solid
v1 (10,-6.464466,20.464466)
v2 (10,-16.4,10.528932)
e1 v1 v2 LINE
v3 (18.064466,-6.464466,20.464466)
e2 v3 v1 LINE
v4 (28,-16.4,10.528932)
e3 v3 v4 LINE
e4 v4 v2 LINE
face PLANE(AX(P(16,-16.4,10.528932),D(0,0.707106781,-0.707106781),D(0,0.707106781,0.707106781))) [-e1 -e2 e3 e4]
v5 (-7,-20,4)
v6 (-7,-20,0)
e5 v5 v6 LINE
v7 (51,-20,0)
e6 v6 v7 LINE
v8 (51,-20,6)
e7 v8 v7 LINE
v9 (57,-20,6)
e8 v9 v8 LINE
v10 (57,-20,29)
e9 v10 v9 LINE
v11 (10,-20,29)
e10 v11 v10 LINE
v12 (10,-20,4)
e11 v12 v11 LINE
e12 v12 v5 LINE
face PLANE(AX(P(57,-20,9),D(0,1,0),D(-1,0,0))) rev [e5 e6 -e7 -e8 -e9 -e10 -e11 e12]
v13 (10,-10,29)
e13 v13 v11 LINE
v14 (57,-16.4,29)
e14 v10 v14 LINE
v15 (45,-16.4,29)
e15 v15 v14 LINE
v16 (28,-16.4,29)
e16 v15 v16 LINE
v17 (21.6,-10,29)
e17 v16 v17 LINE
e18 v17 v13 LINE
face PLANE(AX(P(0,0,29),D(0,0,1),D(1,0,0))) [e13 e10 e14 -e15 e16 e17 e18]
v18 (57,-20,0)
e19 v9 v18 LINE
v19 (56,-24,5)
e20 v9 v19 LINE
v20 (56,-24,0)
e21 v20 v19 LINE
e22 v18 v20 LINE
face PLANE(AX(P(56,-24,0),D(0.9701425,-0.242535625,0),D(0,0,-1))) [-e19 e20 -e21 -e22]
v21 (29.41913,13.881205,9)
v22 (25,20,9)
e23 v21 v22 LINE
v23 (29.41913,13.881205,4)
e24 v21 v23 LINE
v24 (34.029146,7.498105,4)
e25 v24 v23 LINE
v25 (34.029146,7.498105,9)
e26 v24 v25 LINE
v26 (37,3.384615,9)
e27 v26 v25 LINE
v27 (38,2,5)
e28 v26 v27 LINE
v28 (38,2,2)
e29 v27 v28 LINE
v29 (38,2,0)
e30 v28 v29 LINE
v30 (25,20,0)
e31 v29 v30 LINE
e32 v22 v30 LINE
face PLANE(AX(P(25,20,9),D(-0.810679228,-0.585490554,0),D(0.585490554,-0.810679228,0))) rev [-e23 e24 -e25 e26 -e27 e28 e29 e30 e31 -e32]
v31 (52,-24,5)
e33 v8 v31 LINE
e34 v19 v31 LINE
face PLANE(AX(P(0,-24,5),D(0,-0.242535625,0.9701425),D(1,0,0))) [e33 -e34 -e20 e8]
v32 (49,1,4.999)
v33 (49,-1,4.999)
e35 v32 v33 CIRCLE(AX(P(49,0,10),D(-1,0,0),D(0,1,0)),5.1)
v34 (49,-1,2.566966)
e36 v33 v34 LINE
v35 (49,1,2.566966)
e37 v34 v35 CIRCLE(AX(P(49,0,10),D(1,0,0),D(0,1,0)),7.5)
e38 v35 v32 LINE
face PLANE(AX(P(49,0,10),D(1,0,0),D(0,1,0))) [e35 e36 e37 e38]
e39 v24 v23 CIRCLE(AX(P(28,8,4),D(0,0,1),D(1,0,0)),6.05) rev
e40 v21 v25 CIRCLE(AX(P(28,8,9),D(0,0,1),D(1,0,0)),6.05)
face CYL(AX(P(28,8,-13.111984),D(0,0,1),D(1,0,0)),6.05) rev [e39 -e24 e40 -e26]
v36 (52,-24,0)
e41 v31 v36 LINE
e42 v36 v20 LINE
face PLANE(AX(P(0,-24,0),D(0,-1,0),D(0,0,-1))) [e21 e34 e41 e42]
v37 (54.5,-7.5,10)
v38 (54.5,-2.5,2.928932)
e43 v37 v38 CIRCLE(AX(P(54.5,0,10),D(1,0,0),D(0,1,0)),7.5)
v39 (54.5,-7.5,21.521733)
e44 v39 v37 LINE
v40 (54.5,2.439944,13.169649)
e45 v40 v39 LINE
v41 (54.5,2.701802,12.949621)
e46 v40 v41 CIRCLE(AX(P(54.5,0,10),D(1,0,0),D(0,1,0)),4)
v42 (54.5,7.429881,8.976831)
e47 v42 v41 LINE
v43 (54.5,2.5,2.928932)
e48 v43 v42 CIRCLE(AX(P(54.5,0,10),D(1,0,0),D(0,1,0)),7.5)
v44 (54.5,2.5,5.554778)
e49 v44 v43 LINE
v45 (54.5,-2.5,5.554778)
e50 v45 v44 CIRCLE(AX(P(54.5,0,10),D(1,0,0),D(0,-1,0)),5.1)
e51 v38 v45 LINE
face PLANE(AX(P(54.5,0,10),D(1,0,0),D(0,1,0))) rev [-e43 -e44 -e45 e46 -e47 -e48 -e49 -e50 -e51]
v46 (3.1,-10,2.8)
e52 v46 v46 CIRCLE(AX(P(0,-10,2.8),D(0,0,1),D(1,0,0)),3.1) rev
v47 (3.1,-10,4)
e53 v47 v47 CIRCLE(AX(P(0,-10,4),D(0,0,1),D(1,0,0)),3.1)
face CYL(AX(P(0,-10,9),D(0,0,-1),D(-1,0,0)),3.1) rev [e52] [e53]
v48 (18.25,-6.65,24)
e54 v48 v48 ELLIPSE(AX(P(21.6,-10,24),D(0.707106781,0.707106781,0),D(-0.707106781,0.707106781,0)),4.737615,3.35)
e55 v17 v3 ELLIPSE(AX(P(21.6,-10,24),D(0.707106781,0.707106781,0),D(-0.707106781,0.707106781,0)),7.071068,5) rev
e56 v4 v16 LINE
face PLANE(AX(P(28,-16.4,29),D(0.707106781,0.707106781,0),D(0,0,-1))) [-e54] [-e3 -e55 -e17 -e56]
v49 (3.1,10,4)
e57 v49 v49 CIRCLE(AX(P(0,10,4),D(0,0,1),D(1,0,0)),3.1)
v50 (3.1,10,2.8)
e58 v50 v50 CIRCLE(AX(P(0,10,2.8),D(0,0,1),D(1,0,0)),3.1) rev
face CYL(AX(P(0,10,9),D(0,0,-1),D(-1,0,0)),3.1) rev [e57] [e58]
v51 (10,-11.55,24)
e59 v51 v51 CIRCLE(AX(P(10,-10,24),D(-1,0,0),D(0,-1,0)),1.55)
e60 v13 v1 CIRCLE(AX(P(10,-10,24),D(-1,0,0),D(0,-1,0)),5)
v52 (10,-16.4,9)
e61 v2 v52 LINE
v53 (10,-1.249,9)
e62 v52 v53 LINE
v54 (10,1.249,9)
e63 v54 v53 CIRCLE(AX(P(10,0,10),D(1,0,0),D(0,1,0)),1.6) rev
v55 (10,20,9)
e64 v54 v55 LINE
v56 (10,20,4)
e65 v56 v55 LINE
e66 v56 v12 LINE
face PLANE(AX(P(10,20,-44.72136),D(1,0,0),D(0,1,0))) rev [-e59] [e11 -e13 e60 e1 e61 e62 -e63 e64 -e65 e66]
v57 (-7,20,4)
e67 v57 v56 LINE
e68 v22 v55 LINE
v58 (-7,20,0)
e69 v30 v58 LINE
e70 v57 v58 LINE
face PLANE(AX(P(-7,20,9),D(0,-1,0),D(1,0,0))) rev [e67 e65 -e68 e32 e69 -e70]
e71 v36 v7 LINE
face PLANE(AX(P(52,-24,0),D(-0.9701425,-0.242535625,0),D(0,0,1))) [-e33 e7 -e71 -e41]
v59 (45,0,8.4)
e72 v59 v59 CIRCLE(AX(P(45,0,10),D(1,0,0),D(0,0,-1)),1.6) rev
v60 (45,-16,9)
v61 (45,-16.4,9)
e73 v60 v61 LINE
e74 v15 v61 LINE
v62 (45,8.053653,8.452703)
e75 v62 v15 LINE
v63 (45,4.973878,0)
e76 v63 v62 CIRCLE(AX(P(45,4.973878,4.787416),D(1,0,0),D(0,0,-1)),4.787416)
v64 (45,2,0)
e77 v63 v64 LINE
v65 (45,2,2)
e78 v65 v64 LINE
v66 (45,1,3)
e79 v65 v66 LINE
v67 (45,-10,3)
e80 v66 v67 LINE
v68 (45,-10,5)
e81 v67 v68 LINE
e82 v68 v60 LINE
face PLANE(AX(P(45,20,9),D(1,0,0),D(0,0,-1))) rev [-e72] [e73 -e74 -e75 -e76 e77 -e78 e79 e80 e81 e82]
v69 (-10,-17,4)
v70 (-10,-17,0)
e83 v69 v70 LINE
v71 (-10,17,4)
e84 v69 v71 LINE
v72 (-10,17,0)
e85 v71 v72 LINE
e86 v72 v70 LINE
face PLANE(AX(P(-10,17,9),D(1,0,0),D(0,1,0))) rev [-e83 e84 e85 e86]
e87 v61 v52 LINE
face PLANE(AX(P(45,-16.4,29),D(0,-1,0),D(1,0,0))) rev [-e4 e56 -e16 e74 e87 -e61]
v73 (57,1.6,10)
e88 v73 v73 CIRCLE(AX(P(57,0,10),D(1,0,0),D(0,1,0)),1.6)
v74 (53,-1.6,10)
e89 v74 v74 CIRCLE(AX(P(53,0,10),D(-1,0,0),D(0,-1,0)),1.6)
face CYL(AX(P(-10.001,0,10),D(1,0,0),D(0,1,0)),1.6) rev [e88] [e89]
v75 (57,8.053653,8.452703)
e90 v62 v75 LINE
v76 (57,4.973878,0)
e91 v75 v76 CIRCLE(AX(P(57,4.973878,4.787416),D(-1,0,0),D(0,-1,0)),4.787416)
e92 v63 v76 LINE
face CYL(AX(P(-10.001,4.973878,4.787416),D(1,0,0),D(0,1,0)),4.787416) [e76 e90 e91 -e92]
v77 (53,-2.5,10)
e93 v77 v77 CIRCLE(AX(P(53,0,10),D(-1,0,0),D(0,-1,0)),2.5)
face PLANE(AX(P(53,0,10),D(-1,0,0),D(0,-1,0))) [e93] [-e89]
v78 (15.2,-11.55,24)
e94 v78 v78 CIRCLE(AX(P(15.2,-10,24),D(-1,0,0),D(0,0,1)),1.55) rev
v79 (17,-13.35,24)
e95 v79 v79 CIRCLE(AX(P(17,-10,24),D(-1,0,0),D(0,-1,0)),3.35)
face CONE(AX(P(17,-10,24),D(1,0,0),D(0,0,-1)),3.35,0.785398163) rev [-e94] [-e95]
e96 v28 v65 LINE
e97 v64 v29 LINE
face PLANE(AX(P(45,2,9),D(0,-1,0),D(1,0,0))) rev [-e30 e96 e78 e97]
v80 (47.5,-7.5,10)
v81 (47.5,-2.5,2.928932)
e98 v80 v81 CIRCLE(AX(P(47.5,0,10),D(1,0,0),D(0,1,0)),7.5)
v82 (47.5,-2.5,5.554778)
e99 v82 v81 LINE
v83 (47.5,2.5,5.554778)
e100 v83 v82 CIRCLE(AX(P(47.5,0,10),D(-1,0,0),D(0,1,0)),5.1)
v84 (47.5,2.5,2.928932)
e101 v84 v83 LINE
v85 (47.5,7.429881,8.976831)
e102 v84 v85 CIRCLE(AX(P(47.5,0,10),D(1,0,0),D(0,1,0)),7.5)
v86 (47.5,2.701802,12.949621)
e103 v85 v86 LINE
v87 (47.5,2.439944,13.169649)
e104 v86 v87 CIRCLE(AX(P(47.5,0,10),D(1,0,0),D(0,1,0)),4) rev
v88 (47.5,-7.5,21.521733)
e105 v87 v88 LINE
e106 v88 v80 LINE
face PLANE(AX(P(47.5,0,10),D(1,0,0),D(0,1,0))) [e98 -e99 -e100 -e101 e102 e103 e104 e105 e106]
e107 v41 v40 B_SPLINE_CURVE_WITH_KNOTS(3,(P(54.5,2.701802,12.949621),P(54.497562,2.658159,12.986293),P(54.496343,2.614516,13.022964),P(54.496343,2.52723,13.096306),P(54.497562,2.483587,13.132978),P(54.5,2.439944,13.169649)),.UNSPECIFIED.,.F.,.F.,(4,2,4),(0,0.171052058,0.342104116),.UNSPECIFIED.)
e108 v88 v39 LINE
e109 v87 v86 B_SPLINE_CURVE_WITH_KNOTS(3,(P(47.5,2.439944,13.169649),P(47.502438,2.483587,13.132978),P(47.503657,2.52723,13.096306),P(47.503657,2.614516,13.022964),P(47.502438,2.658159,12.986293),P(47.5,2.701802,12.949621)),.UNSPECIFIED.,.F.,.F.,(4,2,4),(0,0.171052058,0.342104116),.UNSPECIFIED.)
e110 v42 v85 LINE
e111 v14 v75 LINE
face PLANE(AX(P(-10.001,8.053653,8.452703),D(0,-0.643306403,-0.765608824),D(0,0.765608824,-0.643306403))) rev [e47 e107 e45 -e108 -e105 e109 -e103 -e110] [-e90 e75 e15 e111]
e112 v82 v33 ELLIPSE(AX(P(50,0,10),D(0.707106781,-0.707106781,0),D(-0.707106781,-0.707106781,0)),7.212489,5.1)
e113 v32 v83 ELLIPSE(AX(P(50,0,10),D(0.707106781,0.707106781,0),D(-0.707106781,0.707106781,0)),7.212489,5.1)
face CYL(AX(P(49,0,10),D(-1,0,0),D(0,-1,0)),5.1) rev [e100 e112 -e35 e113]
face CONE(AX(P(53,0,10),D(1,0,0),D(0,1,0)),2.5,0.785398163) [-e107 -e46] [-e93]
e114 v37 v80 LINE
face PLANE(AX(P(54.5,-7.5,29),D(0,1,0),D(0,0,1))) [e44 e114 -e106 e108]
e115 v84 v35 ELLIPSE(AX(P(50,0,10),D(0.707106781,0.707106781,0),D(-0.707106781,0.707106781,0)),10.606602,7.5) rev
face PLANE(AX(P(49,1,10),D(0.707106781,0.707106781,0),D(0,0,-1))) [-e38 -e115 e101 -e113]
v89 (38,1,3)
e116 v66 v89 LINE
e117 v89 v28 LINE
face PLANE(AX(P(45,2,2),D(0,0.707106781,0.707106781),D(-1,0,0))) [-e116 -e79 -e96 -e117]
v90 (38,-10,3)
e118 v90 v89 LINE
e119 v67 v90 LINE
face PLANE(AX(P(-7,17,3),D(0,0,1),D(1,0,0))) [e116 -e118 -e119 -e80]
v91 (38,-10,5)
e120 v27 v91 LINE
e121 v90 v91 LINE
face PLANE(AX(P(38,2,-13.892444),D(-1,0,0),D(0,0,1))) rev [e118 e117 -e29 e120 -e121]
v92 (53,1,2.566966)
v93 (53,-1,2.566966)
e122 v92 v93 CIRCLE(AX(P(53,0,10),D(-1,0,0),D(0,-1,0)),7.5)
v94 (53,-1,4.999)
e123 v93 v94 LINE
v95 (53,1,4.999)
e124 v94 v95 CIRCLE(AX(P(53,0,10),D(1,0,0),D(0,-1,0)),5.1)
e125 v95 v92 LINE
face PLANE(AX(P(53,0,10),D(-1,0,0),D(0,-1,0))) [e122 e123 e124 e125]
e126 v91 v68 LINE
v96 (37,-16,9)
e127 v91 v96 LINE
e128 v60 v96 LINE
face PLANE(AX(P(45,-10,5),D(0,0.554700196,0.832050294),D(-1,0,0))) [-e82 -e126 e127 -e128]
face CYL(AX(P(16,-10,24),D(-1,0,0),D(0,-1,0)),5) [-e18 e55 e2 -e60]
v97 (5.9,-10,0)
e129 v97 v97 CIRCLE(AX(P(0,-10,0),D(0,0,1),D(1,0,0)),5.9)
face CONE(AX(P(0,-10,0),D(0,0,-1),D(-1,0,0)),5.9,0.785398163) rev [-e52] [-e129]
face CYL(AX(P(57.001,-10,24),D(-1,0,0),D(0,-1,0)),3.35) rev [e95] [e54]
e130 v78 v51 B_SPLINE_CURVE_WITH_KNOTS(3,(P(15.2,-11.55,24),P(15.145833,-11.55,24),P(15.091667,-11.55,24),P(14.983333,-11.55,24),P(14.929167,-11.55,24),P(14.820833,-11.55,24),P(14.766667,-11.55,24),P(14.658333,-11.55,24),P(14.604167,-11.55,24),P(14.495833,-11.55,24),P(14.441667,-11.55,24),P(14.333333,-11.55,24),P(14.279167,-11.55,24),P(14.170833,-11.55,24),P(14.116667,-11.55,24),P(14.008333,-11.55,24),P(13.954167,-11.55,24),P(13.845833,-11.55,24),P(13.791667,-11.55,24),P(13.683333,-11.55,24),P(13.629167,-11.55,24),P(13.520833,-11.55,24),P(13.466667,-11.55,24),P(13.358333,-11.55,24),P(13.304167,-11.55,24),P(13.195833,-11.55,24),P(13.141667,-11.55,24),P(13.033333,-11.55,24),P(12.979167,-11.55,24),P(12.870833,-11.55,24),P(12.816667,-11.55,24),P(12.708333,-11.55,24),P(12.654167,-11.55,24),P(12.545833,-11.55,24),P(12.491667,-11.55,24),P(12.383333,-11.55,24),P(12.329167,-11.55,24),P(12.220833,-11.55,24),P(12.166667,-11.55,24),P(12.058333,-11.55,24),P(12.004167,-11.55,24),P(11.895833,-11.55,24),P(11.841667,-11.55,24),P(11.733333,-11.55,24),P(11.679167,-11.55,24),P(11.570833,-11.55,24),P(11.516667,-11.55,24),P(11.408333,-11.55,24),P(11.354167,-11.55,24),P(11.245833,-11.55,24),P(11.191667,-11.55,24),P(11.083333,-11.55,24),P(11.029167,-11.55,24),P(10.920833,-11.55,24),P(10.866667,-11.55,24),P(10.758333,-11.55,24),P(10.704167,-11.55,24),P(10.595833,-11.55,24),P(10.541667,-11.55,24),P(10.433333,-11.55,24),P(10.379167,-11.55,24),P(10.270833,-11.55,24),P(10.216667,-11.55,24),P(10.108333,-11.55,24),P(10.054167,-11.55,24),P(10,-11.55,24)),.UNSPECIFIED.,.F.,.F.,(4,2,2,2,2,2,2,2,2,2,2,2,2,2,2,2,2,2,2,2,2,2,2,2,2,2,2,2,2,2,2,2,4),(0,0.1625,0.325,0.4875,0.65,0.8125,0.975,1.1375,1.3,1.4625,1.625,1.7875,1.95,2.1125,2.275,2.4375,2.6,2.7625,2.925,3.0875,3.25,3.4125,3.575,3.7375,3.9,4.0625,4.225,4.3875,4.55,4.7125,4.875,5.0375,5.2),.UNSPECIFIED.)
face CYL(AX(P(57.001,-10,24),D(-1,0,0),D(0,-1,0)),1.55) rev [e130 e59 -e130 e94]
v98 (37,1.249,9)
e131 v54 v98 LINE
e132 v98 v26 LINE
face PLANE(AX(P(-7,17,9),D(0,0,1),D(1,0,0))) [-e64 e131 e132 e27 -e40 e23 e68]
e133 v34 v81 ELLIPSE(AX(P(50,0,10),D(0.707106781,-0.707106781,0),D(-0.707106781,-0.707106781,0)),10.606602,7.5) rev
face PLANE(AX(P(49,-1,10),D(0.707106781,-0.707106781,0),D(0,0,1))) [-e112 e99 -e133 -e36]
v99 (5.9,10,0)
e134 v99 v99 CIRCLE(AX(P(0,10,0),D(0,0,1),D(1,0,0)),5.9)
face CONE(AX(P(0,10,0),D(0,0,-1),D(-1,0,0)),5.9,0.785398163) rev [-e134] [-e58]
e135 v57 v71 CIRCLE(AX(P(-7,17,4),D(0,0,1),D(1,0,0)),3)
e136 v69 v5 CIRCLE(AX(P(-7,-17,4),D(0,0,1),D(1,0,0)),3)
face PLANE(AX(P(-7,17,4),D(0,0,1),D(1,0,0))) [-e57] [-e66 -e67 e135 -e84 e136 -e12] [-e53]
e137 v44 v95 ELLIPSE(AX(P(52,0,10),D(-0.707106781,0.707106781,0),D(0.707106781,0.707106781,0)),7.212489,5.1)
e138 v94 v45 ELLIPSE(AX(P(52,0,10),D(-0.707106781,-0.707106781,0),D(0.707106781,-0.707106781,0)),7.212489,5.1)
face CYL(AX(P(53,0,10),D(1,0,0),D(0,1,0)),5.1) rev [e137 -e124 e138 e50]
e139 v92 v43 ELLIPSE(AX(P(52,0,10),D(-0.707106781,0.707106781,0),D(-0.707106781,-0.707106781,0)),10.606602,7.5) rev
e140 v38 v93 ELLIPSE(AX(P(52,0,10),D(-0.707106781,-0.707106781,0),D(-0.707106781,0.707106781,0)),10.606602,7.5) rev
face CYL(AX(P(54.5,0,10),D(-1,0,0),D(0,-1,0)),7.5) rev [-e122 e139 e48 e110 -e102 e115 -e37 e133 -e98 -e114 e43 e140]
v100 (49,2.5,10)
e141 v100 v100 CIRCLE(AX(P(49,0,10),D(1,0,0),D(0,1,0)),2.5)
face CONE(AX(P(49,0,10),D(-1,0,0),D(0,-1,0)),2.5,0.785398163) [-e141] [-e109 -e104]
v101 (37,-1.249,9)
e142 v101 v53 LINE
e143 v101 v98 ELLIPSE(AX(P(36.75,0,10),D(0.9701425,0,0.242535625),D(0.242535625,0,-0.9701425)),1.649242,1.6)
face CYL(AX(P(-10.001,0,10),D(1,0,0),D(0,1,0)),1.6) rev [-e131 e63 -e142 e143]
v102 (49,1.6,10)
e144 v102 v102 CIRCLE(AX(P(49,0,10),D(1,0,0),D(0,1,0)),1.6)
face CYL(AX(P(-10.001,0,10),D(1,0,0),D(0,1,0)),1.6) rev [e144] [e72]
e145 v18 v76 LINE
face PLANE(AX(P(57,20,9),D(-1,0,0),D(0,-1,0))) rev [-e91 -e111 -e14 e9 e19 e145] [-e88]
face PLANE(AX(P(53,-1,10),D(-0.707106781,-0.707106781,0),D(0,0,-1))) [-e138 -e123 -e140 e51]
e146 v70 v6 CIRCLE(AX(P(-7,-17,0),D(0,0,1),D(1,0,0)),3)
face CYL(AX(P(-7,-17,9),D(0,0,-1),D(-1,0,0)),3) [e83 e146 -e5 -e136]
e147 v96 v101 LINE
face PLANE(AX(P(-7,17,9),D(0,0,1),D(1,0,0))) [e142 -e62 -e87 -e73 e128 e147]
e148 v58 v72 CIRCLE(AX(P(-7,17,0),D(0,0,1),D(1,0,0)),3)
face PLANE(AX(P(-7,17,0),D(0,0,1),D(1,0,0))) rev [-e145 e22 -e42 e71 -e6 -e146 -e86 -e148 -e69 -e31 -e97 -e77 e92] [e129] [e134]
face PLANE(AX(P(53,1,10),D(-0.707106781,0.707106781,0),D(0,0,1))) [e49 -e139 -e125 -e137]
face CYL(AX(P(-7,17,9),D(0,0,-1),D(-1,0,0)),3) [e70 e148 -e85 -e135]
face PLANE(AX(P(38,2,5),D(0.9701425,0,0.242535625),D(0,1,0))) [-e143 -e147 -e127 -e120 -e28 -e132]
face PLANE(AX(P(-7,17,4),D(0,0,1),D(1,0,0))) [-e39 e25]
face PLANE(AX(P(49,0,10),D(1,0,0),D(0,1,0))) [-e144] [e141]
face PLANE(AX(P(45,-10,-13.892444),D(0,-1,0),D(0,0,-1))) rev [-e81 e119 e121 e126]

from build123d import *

# Parameters (mm, degrees)
SKETCH1_R               = 3.1
BOSS_EXTRUDE1_DEPTH     = 9
SKETCH2_W               = 20
SKETCH2_H               = 40
CUT_EXTRUDE1_DEPTH      = 5
SKETCH3_R               = 6.05
CUT_EXTRUDE2_DEPTH      = 5
BOSS_EXTRUDE2_DEPTH     = 20
CUT_EXTRUDE4_REACH      = 77.697
SKETCH6_R               = 1.6
CUT_EXTRUDE3_DEPTH      = 3.5
CUT_EXTRUDE3_DEPTH_BACK = 3.5
SKETCH11_W              = 7
SKETCH11_H              = 12
CUT_EXTRUDE9_DEPTH      = 6
CHAMFER3_SIZE           = 6
CHAMFER3_SIZE2          = 4
CHAMFER4_SIZE           = 1
BOSS_EXTRUDE3_START     = 1.5
SKETCH12_R              = 2.5
SKETCH12_R_2            = 1.6
BOSS_EXTRUDE3_DEPTH     = 1.5
SKETCH13_R              = 2.5
SKETCH13_R_2            = 1.6
BOSS_EXTRUDE4_DEPTH     = 1.5
CHAMFER6_SIZE           = 1.5
SKETCH14_W              = 6
SKETCH14_H              = 6
BOSS_EXTRUDE5_DEPTH     = 4
CHAMFER7_SIZE           = 4
CHAMFER7_SIZE_2         = 1
CHAMFER8_SIZE2          = 1
CHAMFER8_SIZE           = 4
CHAMFER9_SIZE           = 2.8
BOSS_EXTRUDE6_DEPTH     = 6
CHAMFER10_START         = 16
CHAMFER10_DEPTH         = 0.6
CHAMFER10_START_2       = 16.6
CHAMFER10_2_DEPTH       = 11.4
CHAMFER10_START_3       = 10
CHAMFER10_3_DEPTH       = 19
CUT_EXTRUDE10_REACH     = 62.216
SKETCH16_R              = 1.55
CUT_EXTRUDE11_REACH     = 69.216
CUT_EXTRUDE11_START     = -7
SKETCH17_R              = 3.35
CHAMFER11_SIZE          = 1.8


with BuildPart() as part:
    # Sketch1 → Boss-Extrude1 (new body)
    with BuildSketch(Plane.XY):
        with BuildLine():
            Line((-10, 17), (-10, -17))
            ThreePointArc((-10, -17), (-9.121320344, -19.121320344), (-7, -20))
            Line((-7, -20), (57, -20))
            Line((57, -20), (57, 20))
            Line((57, 20), (45, 20))
            Line((45, 20), (45, 2))
            Line((45, 2), (38, 2))
            Line((38, 2), (25, 20))
            Line((25, 20), (10, 20))
            Line((10, 20), (-7, 20))
            ThreePointArc((-7, 20), (-9.121320344, 19.121320344), (-10, 17))
        make_face()
        with Locations((0, 10)):
            Circle(SKETCH1_R, mode=Mode.SUBTRACT)
        with Locations((0, -10)):
            Circle(SKETCH1_R, mode=Mode.SUBTRACT)
    extrude(amount=BOSS_EXTRUDE1_DEPTH)

    # Sketch2 → Cut-Extrude1 (cut)
    with BuildSketch(Plane.XY.offset(9)):
        Rectangle(SKETCH2_W, SKETCH2_H)
    extrude(amount=-CUT_EXTRUDE1_DEPTH, mode=Mode.SUBTRACT)

    # Sketch3 → Cut-Extrude2 (cut)
    with BuildSketch(Plane.XY.offset(9)):
        with Locations((28, 8)):
            Circle(SKETCH3_R)
    extrude(amount=-CUT_EXTRUDE2_DEPTH, mode=Mode.SUBTRACT)

    # Sketch4 → Boss-Extrude2 (add)
    with BuildSketch(Plane.XY.offset(9)):
        Polygon((57, -20), (57, 20), (45, 20), (45, -16.4), (10, -16.4), (10, -20), align=None)
    extrude(amount=BOSS_EXTRUDE2_DEPTH)

    # Sketch6 → Cut-Extrude4 (cut, up to next)
    with BuildSketch(Plane(origin=(57, 0, 0), x_dir=(0, 0, -1), z_dir=(1, 0, 0)), mode=Mode.PRIVATE) as cut_extrude4_sk1:
        with Locations(Location((-10, 0, 0), (0, 0, 90))):
            Circle(SKETCH6_R)
    cut_extrude4_tool1 = extrude(cut_extrude4_sk1.sketch, amount=-CUT_EXTRUDE4_REACH, mode=Mode.PRIVATE) & part.part
    # Sketch6 → Cut-Extrude4 (cut, up to next)
    with BuildSketch(Plane(origin=(57, 0, 0), x_dir=(0, 0, -1), z_dir=(1, 0, 0)), mode=Mode.PRIVATE) as cut_extrude4_sk2:
        with BuildLine():
            Line((-8.452703128, 8.053653381), (-29, -16.4))
            Line((-29, -16.4), (-29, 20))
            Line((-29, 20), (0, 20))
            Line((0, 20), (0, 4.973878308))
            ThreePointArc((0, 4.973878308), (-3.148499311, 9.472022499), (-8.452703128, 8.053653381))
        make_face()
    cut_extrude4_tool2 = extrude(cut_extrude4_sk2.sketch, amount=-CUT_EXTRUDE4_REACH, mode=Mode.PRIVATE) & part.part
    add(cut_extrude4_tool1.solids().sort_by_distance((57, 0, 10))[0], mode=Mode.SUBTRACT)
    add(cut_extrude4_tool2.solids().sort_by_distance((57, 8.078553, 17.874396))[0], mode=Mode.SUBTRACT)

    # Sketch5 → Cut-Extrude3 (cut, two sides: drawn at the far end of the back side and taken through both)
    with BuildSketch(Plane(origin=(51, 0, 0), x_dir=(0, 0, -1), z_dir=(1, 0, 0)).offset(-CUT_EXTRUDE3_DEPTH_BACK)):
        with BuildLine():
            Line((-10, 7.5), (-29, 7.5))
            Line((-29, 7.5), (-29, -7.5))
            Line((-29, -7.5), (-10, -7.5))
            ThreePointArc((-10, -7.5), (-2.5, 0), (-10, 7.5))
        make_face()
    extrude(amount=CUT_EXTRUDE3_DEPTH + CUT_EXTRUDE3_DEPTH_BACK, mode=Mode.SUBTRACT)

    # Sketch11 → Cut-Extrude9 (cut)
    with BuildSketch(Plane.XY.offset(9)):
        with Locations((41.5, -4)):
            Rectangle(SKETCH11_W, SKETCH11_H)
    extrude(amount=-CUT_EXTRUDE9_DEPTH, mode=Mode.SUBTRACT)

    # Chamfer3
    chamfer3_edges = [part.edges().sort_by_distance(p)[0] for p in [
        (41.5, -10, 9),
    ]]
    chamfer3_side = [part.faces().sort_by_distance(p)[0] for p in [
        (25.671541958, -9.242433067, 9),
    ]]
    chamfer(chamfer3_edges, length=CHAMFER3_SIZE, length2=CHAMFER3_SIZE2, reference=chamfer3_side[0])

    # Chamfer4
    chamfer4_edges = [part.edges().sort_by_distance(p)[0] for p in [
        (41.5, 2, 3),
    ]]
    chamfer(chamfer4_edges, length=CHAMFER4_SIZE)

    # Sketch12 → Boss-Extrude3 (add)
    # profile 1 of 2: a face of its own
    with BuildSketch(Plane(origin=(47.5, 0, 0), x_dir=(0, 0, -1), z_dir=(1, 0, 0)).offset(BOSS_EXTRUDE3_START)):
        with Locations(Location((-10, 0, 0), (0, 0, 90))):
            Circle(SKETCH12_R)
        with Locations(Location((-10, 0, 0), (0, 0, 90))):
            Circle(SKETCH12_R_2, mode=Mode.SUBTRACT)
    # profile 2 of 2: a face of its own
    with BuildSketch(Plane(origin=(47.5, 0, 0), x_dir=(0, 0, -1), z_dir=(1, 0, 0)).offset(BOSS_EXTRUDE3_START)):
        with BuildLine():
            Line((-5.554777846, 2.5), (-2.822197066, 2.5))
            ThreePointArc((-2.822197066, 2.5), (-2.399285891, 0), (-2.822197066, -2.5))
            Line((-2.822197066, -2.5), (-5.554777846, -2.5))
            ThreePointArc((-5.554777846, -2.5), (-4.9, 0), (-5.554777846, 2.5))
        make_face()
    extrude(amount=-BOSS_EXTRUDE3_DEPTH)

    # Sketch13 → Boss-Extrude4 (add)
    # profile 1 of 2: a face of its own
    with BuildSketch(Plane.ZY.offset(-54.5)):
        with Locations(Location((10, 0, 0), (0, 0, 90))):
            Circle(SKETCH13_R)
        with Locations(Location((10, 0, 0), (0, 0, 90))):
            Circle(SKETCH13_R_2, mode=Mode.SUBTRACT)
    # profile 2 of 2: a face of its own
    with BuildSketch(Plane.ZY.offset(-54.5)):
        with BuildLine():
            Line((5.554777846, 2.5), (2.928932188, 2.5))
            ThreePointArc((2.928932188, 2.5), (2.5, 0), (2.928932188, -2.5))
            Line((2.928932188, -2.5), (5.554777846, -2.5))
            ThreePointArc((5.554777846, -2.5), (4.9, 0), (5.554777846, 2.5))
        make_face()
    extrude(amount=BOSS_EXTRUDE4_DEPTH)

    # Chamfer6
    # the kernel refuses this chamfer: 1.5 mm, written as the material it adds along each edge
    with BuildSketch(Plane(origin=(54.5, 0, 10), x_dir=(0, 1, 0), z_dir=(0, 0, 1))) as chamfer6_piece_1_section:
        Polygon((2.5 + CHAMFER6_SIZE, 0), (2.5, CHAMFER6_SIZE), (2.5, 0), align=None)
    chamfer6_piece_1 = revolve(axis=Axis((54.5, 0, 10), (-1, 0, 0)), mode=Mode.PRIVATE)
    chamfer6_piece_1 = split(chamfer6_piece_1, bisect_by=Plane(origin=(54.5, 2.570872815, 13.059635197), z_dir=(0, -0.6433064031075088, -0.7656088242182685)), keep=Keep.TOP, mode=Mode.PRIVATE)
    add(chamfer6_piece_1)
    with BuildSketch(Plane(origin=(47.5, 0, 10), x_dir=(0, 1, 0), z_dir=(0, 0, -1))) as chamfer6_piece_2_section:
        Polygon((2.5 + CHAMFER6_SIZE, 0), (2.5, CHAMFER6_SIZE), (2.5, 0), align=None)
    chamfer6_piece_2 = revolve(axis=Axis((47.5, 0, 10), (1, 0, 0)), mode=Mode.PRIVATE)
    chamfer6_piece_2 = split(chamfer6_piece_2, bisect_by=Plane(origin=(47.5, 2.570872815, 13.059635197), z_dir=(0, -0.6433064031075088, -0.7656088242182685)), keep=Keep.TOP, mode=Mode.PRIVATE)
    add(chamfer6_piece_2)
    # the kernel refuses this chamfer: 1.5 mm, written as the material it takes off along each edge
    with BuildSketch(Plane(origin=(49, -2.5, -0.928592294), x_dir=(-1, 0, 0), z_dir=(0, 0, 1))) as chamfer6_2_piece_1_section:
        Polygon((CHAMFER6_SIZE, 0), (0, -CHAMFER6_SIZE), (0, 0), align=None)
    chamfer6_2_piece_1 = extrude(amount=10.340894622, mode=Mode.PRIVATE)
    chamfer6_2_piece_1 = chamfer6_2_piece_1 & Plane(origin=(49, 0, 10), x_dir=(0, -1, 0), z_dir=(-1, 0, 0)) * Cylinder(7.5, 27, mode=Mode.PRIVATE)
    chamfer6_2_piece_1 = chamfer6_2_piece_1 - Plane(origin=(49, 0, 10), x_dir=(0, -0.49019607843137236, -0.8716121870938381), z_dir=(1, 0, 0)) * Cylinder(5.1, 27, mode=Mode.PRIVATE)
    add(chamfer6_2_piece_1, mode=Mode.SUBTRACT)
    with BuildSketch(Plane(origin=(49, 2.5, 9.412302328), x_dir=(0, -1, 0), z_dir=(0, 0, -1))) as chamfer6_2_piece_2_section:
        Polygon((CHAMFER6_SIZE, 0), (0, CHAMFER6_SIZE), (0, 0), align=None)
    chamfer6_2_piece_2 = extrude(amount=10.340894622, mode=Mode.PRIVATE)
    chamfer6_2_piece_2 = chamfer6_2_piece_2 & Plane(origin=(49, 0, 10), x_dir=(0, -1, 0), z_dir=(-1, 0, 0)) * Cylinder(7.5, 27, mode=Mode.PRIVATE)
    chamfer6_2_piece_2 = chamfer6_2_piece_2 - Plane(origin=(49, 0, 10), x_dir=(0, -0.49019607843137236, -0.8716121870938381), z_dir=(1, 0, 0)) * Cylinder(5.1, 27, mode=Mode.PRIVATE)
    add(chamfer6_2_piece_2, mode=Mode.SUBTRACT)
    with BuildSketch(Plane(origin=(53, -2.5, -0.928592294), x_dir=(1, 0, 0), z_dir=(0, 0, 1))) as chamfer6_2_piece_3_section:
        Polygon((CHAMFER6_SIZE, 0), (0, CHAMFER6_SIZE), (0, 0), align=None)
    chamfer6_2_piece_3 = extrude(amount=10.340894622, mode=Mode.PRIVATE)
    chamfer6_2_piece_3 = chamfer6_2_piece_3 & Plane(origin=(53, 0, 10), x_dir=(0, -1, 0), z_dir=(-1, 0, 0)) * Cylinder(7.5, 27, mode=Mode.PRIVATE)
    chamfer6_2_piece_3 = chamfer6_2_piece_3 - Plane(origin=(53, 0, 10), x_dir=(0, -0.4901960784313735, -0.8716121870938375), z_dir=(1, 0, 0)) * Cylinder(5.1, 27, mode=Mode.PRIVATE)
    add(chamfer6_2_piece_3, mode=Mode.SUBTRACT)
    with BuildSketch(Plane(origin=(53, 2.5, 9.412302328), x_dir=(1, 0, 0), z_dir=(0, 0, -1))) as chamfer6_2_piece_4_section:
        Polygon((CHAMFER6_SIZE, 0), (0, CHAMFER6_SIZE), (0, 0), align=None)
    chamfer6_2_piece_4 = extrude(amount=10.340894622, mode=Mode.PRIVATE)
    chamfer6_2_piece_4 = chamfer6_2_piece_4 & Plane(origin=(53, 0, 10), x_dir=(0, -1, 0), z_dir=(-1, 0, 0)) * Cylinder(7.5, 27, mode=Mode.PRIVATE)
    chamfer6_2_piece_4 = chamfer6_2_piece_4 - Plane(origin=(53, 0, 10), x_dir=(0, -0.4901960784313735, -0.8716121870938375), z_dir=(1, 0, 0)) * Cylinder(5.1, 27, mode=Mode.PRIVATE)
    add(chamfer6_2_piece_4, mode=Mode.SUBTRACT)

    # Sketch14 → Boss-Extrude5 (add)
    with BuildSketch(Plane.XZ.offset(20)):
        with Locations((54, 3)):
            Rectangle(SKETCH14_W, SKETCH14_H)
    extrude(amount=BOSS_EXTRUDE5_DEPTH)

    # Chamfer7
    # the kernel refuses this chamfer: 4, 1 mm, written as the material it takes off along each edge
    with BuildSketch(Plane(origin=(40.611490001, -24, 6), x_dir=(0, 1, 0), z_dir=(1, 0, 0)), Plane(origin=(51, -24, -10.388509999), x_dir=(0, 1, 0), z_dir=(0, 0, 1)), Plane(origin=(57, -24, 16.388509999), x_dir=(0, 1, 0), z_dir=(0, 0, -1))) as chamfer7_piece_1:
        Polygon((CHAMFER7_SIZE, 0), (0, -CHAMFER7_SIZE_2), (0, 0), align=None)
    extrude(amount=26.777019998, mode=Mode.SUBTRACT)

    # Chamfer8
    chamfer8_edges = [part.edges().sort_by_distance(p)[0] for p in [
        (38, -8.6244998, 9),
    ]]
    chamfer8_side = [part.faces().sort_by_distance(p)[0] for p in [
        (38, -8.6244998, 8.98),
    ]]
    chamfer(chamfer8_edges, length=CHAMFER8_SIZE - 0.0001, length2=CHAMFER8_SIZE2 - 0.0001, reference=chamfer8_side[0])  # a hair under: the kernel refuses the full size

    # Chamfer9
    chamfer9_edges = [part.edges().sort_by_distance(p)[0] for p in [
        (-3.1, 10, 0),
        (-3.1, -10, 0),
    ]]
    chamfer(chamfer9_edges, length=CHAMFER9_SIZE)

    # Sketch15 → Boss-Extrude6 (add)
    with BuildSketch(Plane.ZY.offset(-10)):
        with BuildLine():
            Line((29, -10), (29, -16.4))
            Line((29, -16.4), (10.528932188, -16.4))
            Line((10.528932188, -16.4), (20.464466094, -6.464466094))
            ThreePointArc((20.464466094, -6.464466094), (25.913417162, -5.380602337), (29, -10))
        make_face()
    extrude(amount=-BOSS_EXTRUDE6_DEPTH)

    # Chamfer10: read off the stored shape, not the designer's step
    # Chamfer10 outline → Chamfer10 (add)
    with BuildSketch(Plane.YZ.offset(CHAMFER10_START)):
        with BuildLine():
            ThreePointArc((-6.464466094, 20.464466094), (-5.380602337, 25.913417162), (-10, 29))
            Line((-10, 29), (-16.4, 29))
            Line((-16.4, 29), (-16.4, 10.528932188))
            Line((-16.4, 10.528932188), (-6.464466094, 20.464466094))
        make_face()
    extrude(amount=CHAMFER10_DEPTH)

    # Chamfer10 2 outline → Chamfer10 2 (add)
    with BuildSketch(Plane.YZ.offset(CHAMFER10_START_2)):
        with BuildLine():
            ThreePointArc((-6.464466094, 20.464466094), (-5.380602337, 25.913417162), (-10, 29))
            Line((-10, 29), (-16.4, 29))
            Line((-16.4, 29), (-16.4, 10.528932188))
            Line((-16.4, 10.528932188), (-6.464466094, 20.464466094))
        make_face()
    extrude(amount=CHAMFER10_2_DEPTH)

    # Chamfer10 3 outline → Chamfer10 3 (cut)
    with BuildSketch(Plane.XY.offset(CHAMFER10_START_3)):
        Polygon((15, -3.4), (28, -16.4), (28, -3), (15, -3), align=None)
    extrude(amount=CHAMFER10_3_DEPTH, mode=Mode.SUBTRACT)

    # Cut-Extrude10: up to this plane
    cut_extrude10_end = Plane(origin=(28, -16.4, 29), z_dir=(0.7071067811865438, 0.7071067811865513, 0))
    # Sketch16 → Cut-Extrude10 (cut, up to the surface)
    with BuildSketch(Plane.ZY.offset(-10), mode=Mode.PRIVATE) as cut_extrude10_sk1:
        with Locations(Location((24, -10, 0), (0, 0, 270))):
            Circle(SKETCH16_R)
    cut_extrude10_tool1 = split(extrude(cut_extrude10_sk1.sketch, amount=-CUT_EXTRUDE10_REACH, mode=Mode.PRIVATE), bisect_by=cut_extrude10_end, keep=Keep.BOTH, mode=Mode.PRIVATE)
    add(cut_extrude10_tool1.solids().sort_by_distance((10, -10, 24))[0], mode=Mode.SUBTRACT)

    # Cut-Extrude11: up to this plane
    cut_extrude11_end = Plane(origin=(28, -16.4, 29), z_dir=(0.7071067811865438, 0.7071067811865513, 0))
    # Sketch17 → Cut-Extrude11 (cut, up to the surface)
    with BuildSketch(Plane.ZY.offset(-10).offset(CUT_EXTRUDE11_START), mode=Mode.PRIVATE) as cut_extrude11_sk1:
        with Locations(Location((24, -10, 0), (0, 0, 270))):
            Circle(SKETCH17_R)
    cut_extrude11_tool1 = split(extrude(cut_extrude11_sk1.sketch, amount=-CUT_EXTRUDE11_REACH, mode=Mode.PRIVATE), bisect_by=cut_extrude11_end, keep=Keep.BOTH, mode=Mode.PRIVATE)
    add(cut_extrude11_tool1.solids().sort_by_distance((17, -10, 24))[0], mode=Mode.SUBTRACT)

    # Chamfer11
    chamfer11_edges = [part.edges().sort_by_distance(p)[0] for p in [
        (17, -8.45, 24),
    ]]
    chamfer(chamfer11_edges, length=CHAMFER11_SIZE - 0.0001)  # a hair under: the kernel refuses the full size


solid = part.part
